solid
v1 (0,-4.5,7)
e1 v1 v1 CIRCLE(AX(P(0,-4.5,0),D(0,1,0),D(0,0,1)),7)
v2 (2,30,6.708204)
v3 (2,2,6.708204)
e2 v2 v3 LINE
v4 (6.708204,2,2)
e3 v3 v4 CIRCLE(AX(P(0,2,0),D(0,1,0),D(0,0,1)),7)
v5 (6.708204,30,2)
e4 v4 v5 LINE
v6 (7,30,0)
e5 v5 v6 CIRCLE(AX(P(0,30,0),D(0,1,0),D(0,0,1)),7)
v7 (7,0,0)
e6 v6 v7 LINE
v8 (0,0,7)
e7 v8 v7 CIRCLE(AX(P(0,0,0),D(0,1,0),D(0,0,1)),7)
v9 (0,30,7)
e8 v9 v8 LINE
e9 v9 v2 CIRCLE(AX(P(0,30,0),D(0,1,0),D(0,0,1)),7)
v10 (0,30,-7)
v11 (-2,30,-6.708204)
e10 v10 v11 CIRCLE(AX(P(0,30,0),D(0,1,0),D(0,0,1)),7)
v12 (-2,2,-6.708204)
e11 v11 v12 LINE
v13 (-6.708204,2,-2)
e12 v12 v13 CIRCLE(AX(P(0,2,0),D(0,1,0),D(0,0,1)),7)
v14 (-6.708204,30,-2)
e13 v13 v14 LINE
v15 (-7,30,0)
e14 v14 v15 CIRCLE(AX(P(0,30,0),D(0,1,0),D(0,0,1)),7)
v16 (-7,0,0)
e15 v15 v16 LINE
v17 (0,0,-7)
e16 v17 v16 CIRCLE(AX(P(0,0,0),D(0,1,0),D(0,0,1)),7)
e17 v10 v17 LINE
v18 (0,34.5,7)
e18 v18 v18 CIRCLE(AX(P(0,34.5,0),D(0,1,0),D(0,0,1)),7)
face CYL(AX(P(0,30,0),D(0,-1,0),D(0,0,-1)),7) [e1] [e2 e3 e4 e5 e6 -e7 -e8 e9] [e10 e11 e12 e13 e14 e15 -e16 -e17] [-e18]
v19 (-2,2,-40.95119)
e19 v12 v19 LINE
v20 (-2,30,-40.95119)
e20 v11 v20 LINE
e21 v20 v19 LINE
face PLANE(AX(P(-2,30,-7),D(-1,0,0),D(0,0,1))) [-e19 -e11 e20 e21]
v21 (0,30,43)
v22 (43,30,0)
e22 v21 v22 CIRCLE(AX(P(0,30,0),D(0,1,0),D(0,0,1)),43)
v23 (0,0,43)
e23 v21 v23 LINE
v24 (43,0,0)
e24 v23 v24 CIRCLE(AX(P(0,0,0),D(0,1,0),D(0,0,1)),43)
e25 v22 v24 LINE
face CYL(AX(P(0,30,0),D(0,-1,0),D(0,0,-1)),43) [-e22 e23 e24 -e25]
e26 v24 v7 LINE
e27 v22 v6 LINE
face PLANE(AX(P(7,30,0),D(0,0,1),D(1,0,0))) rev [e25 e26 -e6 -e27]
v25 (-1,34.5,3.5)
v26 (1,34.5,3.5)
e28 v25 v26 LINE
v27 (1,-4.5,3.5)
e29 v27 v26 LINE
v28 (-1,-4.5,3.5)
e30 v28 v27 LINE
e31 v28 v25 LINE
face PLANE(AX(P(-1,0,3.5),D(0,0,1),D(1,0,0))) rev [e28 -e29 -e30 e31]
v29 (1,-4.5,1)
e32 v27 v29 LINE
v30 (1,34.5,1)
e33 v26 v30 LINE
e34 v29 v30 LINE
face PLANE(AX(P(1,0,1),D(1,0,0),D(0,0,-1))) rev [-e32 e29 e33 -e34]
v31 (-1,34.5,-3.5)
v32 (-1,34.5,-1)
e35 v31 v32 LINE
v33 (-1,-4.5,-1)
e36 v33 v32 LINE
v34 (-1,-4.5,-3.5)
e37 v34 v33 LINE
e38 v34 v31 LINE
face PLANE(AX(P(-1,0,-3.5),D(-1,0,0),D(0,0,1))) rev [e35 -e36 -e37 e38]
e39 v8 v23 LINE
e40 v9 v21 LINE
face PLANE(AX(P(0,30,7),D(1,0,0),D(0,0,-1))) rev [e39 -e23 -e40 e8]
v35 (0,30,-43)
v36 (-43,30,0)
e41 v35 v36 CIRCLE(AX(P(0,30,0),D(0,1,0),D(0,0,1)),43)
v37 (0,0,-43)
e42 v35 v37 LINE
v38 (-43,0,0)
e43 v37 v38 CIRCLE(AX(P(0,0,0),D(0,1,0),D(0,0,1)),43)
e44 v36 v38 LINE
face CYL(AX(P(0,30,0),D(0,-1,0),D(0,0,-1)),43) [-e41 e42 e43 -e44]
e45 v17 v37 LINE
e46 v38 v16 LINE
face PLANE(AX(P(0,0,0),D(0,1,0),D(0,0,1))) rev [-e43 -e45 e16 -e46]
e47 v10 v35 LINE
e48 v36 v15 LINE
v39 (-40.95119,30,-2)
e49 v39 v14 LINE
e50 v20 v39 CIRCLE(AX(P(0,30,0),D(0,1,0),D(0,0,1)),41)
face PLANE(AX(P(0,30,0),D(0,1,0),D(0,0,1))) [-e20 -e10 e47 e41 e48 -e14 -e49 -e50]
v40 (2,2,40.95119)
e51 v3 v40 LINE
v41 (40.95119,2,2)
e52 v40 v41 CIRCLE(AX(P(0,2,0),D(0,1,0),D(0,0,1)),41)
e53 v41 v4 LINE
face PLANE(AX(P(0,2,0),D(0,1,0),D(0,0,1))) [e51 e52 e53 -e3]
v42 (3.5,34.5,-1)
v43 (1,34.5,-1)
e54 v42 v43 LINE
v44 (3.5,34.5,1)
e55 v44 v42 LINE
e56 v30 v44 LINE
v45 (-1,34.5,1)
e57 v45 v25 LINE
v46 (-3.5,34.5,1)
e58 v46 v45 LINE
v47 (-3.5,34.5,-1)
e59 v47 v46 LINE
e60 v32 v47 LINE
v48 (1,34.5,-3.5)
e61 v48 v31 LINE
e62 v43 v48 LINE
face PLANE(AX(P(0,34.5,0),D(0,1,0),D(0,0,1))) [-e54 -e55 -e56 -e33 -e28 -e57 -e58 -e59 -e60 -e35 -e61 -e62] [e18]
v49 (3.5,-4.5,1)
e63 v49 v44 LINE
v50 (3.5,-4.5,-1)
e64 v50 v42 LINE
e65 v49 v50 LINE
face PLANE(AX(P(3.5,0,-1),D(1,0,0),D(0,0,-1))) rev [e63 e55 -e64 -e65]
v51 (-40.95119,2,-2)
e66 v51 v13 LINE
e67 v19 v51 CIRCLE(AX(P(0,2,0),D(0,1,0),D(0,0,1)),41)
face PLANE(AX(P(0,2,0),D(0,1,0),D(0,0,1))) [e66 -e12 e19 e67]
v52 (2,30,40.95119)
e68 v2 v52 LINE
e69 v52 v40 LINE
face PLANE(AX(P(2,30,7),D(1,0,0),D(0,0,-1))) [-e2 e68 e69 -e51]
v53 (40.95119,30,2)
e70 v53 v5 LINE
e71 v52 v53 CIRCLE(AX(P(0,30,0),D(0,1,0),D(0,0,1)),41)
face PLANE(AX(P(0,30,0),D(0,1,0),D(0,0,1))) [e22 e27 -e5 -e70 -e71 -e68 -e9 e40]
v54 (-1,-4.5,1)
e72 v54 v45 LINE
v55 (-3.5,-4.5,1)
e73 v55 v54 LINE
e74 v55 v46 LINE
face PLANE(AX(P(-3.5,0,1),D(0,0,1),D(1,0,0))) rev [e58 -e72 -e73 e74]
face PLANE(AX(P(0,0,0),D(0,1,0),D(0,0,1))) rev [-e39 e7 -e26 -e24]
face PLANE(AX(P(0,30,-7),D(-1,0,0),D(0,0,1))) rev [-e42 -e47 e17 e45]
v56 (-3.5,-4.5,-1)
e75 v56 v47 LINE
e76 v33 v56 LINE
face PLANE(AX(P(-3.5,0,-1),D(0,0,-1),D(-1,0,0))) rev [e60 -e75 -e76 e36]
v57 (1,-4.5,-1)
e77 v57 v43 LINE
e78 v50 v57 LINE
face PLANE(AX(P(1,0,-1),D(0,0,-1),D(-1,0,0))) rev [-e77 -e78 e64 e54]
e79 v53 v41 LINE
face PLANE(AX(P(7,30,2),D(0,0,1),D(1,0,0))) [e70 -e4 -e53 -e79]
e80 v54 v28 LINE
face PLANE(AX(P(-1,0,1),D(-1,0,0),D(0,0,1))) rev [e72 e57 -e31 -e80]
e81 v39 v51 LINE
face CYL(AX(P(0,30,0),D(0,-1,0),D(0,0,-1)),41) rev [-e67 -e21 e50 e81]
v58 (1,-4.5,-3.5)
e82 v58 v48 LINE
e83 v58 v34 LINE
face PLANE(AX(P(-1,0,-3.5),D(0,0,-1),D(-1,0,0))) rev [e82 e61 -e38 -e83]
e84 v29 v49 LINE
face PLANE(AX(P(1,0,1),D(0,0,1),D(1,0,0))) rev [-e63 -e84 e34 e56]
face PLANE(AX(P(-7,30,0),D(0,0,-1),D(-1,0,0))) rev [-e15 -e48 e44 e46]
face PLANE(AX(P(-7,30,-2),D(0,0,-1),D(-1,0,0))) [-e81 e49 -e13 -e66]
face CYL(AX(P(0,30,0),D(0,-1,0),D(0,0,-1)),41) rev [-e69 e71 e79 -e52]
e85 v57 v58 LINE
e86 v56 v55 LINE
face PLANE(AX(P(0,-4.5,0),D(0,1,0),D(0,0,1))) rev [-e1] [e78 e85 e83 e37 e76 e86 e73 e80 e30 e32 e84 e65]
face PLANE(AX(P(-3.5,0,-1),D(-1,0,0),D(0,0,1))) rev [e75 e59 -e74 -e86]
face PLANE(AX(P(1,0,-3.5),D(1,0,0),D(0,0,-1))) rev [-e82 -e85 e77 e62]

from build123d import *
from build123d.topology import SkipClean

# Parameters (mm, degrees)
EXTRUDE_1_DEPTH      = 30
CUT_EXTRUDE_1_DEPTH  = 68.808554033
SHELL_START          = 2
SHELL_1_DEPTH        = 28
EXTRUDE_2_DEPTH      = 4.5
EXTRUDE_2_DEPTH_BACK = 34.5
SKETCH_3_R           = 7


# Read off the part's stored shape, not the designer's step: 抽壳1
with BuildPart() as part:
    # 草图1 → 凸台-拉伸1 (new body)
    with BuildSketch(Plane(origin=(0, 0, 0), x_dir=(1, 0, 0), z_dir=(0, 1, 0))):
        with BuildLine():
            Line((0, 7), (0, 43))
            ThreePointArc((0, 43), (-30.405591591, 30.405591591), (-43, 0))
            Line((-43, 0), (-7, 0))
            ThreePointArc((-7, 0), (-4.949747468, -4.949747468), (0, -7))
            Line((0, -7), (0, -43))
            ThreePointArc((0, -43), (30.405591591, -30.405591591), (43, 0))
            Line((43, 0), (7, 0))
            ThreePointArc((7, 0), (4.949747468, 4.949747468), (0, 7))
        make_face()
    extrude(amount=EXTRUDE_1_DEPTH)

    # 草图2 → 切除-拉伸1 (cut, through all)
    with BuildSketch(Plane(origin=(0, 30, 0), x_dir=(1, 0, 0), z_dir=(0, 1, 0))):
        Polygon((1, -1), (1, -3.5), (-1, -3.5), (-1, -1), (-3.5, -1), (-3.5, 1), (-1, 1), (-1, 3.5), (1, 3.5), (1, 1), (3.5, 1), (3.5, -1), align=None)
    extrude(amount=-CUT_EXTRUDE_1_DEPTH, mode=Mode.SUBTRACT)

    # 抽壳1 outline → 抽壳1 (cut)
    with BuildSketch(Plane(origin=(0, 0, 0), x_dir=(1, 0, 0), z_dir=(0, 1, 0)).offset(SHELL_START)):
        with BuildLine():
            Line((3, -3), (3, -5.5))
            Line((3, -5.5), (2, -5.5))
            Line((2, -5.5), (2, -40.951190459))
            ThreePointArc((2, -40.951190459), (28.991378029, -28.991378029), (40.951190459, -2))
            Line((40.951190459, -2), (5.5, -2))
            Line((5.5, -2), (5.5, -3))
            Line((5.5, -3), (3, -3))
        make_face()
        with BuildLine():
            Line((3, 4), (3, 3))
            Line((3, 3), (4, 3))
            ThreePointArc((4, 3), (3.535533906, 3.535533906), (3, 4))
        make_face()
        with BuildLine():
            Line((-3, -3), (-4, -3))
            ThreePointArc((-4, -3), (-3.535533906, -3.535533906), (-3, -4))
            Line((-3, -4), (-3, -3))
        make_face()
        with BuildLine():
            ThreePointArc((-2, 40.951190459), (-28.991378029, 28.991378029), (-40.951190459, 2))
            Line((-40.951190459, 2), (-5.5, 2))
            Line((-5.5, 2), (-5.5, 3))
            Line((-5.5, 3), (-3, 3))
            Line((-3, 3), (-3, 5.5))
            Line((-3, 5.5), (-2, 5.5))
            Line((-2, 5.5), (-2, 40.951190459))
        make_face()
    extrude(amount=SHELL_1_DEPTH, mode=Mode.SUBTRACT)

    # 草图3 → 凸台-拉伸2 (add, two sides: drawn at the far end of the back side and taken through both)
    with SkipClean():  # the faces are left unmerged after this step: merging them gives an invalid solid
        with BuildSketch(Plane(origin=(0, 30, 0), x_dir=(1, 0, 0), z_dir=(0, 1, 0)).offset(-EXTRUDE_2_DEPTH_BACK)):
            with Locations(Location((0, 0, 0), (0, 0, 270))):
                Circle(SKETCH_3_R)
            Polygon((-3.5, 1), (-1, 1), (-1, 3.5), (1, 3.5), (1, 1), (3.5, 1), (3.5, -1), (1, -1), (1, -3.5), (-1, -3.5), (-1, -1), (-3.5, -1), align=None, mode=Mode.SUBTRACT)
        extrude(amount=EXTRUDE_2_DEPTH + EXTRUDE_2_DEPTH_BACK)


solid = part.part
